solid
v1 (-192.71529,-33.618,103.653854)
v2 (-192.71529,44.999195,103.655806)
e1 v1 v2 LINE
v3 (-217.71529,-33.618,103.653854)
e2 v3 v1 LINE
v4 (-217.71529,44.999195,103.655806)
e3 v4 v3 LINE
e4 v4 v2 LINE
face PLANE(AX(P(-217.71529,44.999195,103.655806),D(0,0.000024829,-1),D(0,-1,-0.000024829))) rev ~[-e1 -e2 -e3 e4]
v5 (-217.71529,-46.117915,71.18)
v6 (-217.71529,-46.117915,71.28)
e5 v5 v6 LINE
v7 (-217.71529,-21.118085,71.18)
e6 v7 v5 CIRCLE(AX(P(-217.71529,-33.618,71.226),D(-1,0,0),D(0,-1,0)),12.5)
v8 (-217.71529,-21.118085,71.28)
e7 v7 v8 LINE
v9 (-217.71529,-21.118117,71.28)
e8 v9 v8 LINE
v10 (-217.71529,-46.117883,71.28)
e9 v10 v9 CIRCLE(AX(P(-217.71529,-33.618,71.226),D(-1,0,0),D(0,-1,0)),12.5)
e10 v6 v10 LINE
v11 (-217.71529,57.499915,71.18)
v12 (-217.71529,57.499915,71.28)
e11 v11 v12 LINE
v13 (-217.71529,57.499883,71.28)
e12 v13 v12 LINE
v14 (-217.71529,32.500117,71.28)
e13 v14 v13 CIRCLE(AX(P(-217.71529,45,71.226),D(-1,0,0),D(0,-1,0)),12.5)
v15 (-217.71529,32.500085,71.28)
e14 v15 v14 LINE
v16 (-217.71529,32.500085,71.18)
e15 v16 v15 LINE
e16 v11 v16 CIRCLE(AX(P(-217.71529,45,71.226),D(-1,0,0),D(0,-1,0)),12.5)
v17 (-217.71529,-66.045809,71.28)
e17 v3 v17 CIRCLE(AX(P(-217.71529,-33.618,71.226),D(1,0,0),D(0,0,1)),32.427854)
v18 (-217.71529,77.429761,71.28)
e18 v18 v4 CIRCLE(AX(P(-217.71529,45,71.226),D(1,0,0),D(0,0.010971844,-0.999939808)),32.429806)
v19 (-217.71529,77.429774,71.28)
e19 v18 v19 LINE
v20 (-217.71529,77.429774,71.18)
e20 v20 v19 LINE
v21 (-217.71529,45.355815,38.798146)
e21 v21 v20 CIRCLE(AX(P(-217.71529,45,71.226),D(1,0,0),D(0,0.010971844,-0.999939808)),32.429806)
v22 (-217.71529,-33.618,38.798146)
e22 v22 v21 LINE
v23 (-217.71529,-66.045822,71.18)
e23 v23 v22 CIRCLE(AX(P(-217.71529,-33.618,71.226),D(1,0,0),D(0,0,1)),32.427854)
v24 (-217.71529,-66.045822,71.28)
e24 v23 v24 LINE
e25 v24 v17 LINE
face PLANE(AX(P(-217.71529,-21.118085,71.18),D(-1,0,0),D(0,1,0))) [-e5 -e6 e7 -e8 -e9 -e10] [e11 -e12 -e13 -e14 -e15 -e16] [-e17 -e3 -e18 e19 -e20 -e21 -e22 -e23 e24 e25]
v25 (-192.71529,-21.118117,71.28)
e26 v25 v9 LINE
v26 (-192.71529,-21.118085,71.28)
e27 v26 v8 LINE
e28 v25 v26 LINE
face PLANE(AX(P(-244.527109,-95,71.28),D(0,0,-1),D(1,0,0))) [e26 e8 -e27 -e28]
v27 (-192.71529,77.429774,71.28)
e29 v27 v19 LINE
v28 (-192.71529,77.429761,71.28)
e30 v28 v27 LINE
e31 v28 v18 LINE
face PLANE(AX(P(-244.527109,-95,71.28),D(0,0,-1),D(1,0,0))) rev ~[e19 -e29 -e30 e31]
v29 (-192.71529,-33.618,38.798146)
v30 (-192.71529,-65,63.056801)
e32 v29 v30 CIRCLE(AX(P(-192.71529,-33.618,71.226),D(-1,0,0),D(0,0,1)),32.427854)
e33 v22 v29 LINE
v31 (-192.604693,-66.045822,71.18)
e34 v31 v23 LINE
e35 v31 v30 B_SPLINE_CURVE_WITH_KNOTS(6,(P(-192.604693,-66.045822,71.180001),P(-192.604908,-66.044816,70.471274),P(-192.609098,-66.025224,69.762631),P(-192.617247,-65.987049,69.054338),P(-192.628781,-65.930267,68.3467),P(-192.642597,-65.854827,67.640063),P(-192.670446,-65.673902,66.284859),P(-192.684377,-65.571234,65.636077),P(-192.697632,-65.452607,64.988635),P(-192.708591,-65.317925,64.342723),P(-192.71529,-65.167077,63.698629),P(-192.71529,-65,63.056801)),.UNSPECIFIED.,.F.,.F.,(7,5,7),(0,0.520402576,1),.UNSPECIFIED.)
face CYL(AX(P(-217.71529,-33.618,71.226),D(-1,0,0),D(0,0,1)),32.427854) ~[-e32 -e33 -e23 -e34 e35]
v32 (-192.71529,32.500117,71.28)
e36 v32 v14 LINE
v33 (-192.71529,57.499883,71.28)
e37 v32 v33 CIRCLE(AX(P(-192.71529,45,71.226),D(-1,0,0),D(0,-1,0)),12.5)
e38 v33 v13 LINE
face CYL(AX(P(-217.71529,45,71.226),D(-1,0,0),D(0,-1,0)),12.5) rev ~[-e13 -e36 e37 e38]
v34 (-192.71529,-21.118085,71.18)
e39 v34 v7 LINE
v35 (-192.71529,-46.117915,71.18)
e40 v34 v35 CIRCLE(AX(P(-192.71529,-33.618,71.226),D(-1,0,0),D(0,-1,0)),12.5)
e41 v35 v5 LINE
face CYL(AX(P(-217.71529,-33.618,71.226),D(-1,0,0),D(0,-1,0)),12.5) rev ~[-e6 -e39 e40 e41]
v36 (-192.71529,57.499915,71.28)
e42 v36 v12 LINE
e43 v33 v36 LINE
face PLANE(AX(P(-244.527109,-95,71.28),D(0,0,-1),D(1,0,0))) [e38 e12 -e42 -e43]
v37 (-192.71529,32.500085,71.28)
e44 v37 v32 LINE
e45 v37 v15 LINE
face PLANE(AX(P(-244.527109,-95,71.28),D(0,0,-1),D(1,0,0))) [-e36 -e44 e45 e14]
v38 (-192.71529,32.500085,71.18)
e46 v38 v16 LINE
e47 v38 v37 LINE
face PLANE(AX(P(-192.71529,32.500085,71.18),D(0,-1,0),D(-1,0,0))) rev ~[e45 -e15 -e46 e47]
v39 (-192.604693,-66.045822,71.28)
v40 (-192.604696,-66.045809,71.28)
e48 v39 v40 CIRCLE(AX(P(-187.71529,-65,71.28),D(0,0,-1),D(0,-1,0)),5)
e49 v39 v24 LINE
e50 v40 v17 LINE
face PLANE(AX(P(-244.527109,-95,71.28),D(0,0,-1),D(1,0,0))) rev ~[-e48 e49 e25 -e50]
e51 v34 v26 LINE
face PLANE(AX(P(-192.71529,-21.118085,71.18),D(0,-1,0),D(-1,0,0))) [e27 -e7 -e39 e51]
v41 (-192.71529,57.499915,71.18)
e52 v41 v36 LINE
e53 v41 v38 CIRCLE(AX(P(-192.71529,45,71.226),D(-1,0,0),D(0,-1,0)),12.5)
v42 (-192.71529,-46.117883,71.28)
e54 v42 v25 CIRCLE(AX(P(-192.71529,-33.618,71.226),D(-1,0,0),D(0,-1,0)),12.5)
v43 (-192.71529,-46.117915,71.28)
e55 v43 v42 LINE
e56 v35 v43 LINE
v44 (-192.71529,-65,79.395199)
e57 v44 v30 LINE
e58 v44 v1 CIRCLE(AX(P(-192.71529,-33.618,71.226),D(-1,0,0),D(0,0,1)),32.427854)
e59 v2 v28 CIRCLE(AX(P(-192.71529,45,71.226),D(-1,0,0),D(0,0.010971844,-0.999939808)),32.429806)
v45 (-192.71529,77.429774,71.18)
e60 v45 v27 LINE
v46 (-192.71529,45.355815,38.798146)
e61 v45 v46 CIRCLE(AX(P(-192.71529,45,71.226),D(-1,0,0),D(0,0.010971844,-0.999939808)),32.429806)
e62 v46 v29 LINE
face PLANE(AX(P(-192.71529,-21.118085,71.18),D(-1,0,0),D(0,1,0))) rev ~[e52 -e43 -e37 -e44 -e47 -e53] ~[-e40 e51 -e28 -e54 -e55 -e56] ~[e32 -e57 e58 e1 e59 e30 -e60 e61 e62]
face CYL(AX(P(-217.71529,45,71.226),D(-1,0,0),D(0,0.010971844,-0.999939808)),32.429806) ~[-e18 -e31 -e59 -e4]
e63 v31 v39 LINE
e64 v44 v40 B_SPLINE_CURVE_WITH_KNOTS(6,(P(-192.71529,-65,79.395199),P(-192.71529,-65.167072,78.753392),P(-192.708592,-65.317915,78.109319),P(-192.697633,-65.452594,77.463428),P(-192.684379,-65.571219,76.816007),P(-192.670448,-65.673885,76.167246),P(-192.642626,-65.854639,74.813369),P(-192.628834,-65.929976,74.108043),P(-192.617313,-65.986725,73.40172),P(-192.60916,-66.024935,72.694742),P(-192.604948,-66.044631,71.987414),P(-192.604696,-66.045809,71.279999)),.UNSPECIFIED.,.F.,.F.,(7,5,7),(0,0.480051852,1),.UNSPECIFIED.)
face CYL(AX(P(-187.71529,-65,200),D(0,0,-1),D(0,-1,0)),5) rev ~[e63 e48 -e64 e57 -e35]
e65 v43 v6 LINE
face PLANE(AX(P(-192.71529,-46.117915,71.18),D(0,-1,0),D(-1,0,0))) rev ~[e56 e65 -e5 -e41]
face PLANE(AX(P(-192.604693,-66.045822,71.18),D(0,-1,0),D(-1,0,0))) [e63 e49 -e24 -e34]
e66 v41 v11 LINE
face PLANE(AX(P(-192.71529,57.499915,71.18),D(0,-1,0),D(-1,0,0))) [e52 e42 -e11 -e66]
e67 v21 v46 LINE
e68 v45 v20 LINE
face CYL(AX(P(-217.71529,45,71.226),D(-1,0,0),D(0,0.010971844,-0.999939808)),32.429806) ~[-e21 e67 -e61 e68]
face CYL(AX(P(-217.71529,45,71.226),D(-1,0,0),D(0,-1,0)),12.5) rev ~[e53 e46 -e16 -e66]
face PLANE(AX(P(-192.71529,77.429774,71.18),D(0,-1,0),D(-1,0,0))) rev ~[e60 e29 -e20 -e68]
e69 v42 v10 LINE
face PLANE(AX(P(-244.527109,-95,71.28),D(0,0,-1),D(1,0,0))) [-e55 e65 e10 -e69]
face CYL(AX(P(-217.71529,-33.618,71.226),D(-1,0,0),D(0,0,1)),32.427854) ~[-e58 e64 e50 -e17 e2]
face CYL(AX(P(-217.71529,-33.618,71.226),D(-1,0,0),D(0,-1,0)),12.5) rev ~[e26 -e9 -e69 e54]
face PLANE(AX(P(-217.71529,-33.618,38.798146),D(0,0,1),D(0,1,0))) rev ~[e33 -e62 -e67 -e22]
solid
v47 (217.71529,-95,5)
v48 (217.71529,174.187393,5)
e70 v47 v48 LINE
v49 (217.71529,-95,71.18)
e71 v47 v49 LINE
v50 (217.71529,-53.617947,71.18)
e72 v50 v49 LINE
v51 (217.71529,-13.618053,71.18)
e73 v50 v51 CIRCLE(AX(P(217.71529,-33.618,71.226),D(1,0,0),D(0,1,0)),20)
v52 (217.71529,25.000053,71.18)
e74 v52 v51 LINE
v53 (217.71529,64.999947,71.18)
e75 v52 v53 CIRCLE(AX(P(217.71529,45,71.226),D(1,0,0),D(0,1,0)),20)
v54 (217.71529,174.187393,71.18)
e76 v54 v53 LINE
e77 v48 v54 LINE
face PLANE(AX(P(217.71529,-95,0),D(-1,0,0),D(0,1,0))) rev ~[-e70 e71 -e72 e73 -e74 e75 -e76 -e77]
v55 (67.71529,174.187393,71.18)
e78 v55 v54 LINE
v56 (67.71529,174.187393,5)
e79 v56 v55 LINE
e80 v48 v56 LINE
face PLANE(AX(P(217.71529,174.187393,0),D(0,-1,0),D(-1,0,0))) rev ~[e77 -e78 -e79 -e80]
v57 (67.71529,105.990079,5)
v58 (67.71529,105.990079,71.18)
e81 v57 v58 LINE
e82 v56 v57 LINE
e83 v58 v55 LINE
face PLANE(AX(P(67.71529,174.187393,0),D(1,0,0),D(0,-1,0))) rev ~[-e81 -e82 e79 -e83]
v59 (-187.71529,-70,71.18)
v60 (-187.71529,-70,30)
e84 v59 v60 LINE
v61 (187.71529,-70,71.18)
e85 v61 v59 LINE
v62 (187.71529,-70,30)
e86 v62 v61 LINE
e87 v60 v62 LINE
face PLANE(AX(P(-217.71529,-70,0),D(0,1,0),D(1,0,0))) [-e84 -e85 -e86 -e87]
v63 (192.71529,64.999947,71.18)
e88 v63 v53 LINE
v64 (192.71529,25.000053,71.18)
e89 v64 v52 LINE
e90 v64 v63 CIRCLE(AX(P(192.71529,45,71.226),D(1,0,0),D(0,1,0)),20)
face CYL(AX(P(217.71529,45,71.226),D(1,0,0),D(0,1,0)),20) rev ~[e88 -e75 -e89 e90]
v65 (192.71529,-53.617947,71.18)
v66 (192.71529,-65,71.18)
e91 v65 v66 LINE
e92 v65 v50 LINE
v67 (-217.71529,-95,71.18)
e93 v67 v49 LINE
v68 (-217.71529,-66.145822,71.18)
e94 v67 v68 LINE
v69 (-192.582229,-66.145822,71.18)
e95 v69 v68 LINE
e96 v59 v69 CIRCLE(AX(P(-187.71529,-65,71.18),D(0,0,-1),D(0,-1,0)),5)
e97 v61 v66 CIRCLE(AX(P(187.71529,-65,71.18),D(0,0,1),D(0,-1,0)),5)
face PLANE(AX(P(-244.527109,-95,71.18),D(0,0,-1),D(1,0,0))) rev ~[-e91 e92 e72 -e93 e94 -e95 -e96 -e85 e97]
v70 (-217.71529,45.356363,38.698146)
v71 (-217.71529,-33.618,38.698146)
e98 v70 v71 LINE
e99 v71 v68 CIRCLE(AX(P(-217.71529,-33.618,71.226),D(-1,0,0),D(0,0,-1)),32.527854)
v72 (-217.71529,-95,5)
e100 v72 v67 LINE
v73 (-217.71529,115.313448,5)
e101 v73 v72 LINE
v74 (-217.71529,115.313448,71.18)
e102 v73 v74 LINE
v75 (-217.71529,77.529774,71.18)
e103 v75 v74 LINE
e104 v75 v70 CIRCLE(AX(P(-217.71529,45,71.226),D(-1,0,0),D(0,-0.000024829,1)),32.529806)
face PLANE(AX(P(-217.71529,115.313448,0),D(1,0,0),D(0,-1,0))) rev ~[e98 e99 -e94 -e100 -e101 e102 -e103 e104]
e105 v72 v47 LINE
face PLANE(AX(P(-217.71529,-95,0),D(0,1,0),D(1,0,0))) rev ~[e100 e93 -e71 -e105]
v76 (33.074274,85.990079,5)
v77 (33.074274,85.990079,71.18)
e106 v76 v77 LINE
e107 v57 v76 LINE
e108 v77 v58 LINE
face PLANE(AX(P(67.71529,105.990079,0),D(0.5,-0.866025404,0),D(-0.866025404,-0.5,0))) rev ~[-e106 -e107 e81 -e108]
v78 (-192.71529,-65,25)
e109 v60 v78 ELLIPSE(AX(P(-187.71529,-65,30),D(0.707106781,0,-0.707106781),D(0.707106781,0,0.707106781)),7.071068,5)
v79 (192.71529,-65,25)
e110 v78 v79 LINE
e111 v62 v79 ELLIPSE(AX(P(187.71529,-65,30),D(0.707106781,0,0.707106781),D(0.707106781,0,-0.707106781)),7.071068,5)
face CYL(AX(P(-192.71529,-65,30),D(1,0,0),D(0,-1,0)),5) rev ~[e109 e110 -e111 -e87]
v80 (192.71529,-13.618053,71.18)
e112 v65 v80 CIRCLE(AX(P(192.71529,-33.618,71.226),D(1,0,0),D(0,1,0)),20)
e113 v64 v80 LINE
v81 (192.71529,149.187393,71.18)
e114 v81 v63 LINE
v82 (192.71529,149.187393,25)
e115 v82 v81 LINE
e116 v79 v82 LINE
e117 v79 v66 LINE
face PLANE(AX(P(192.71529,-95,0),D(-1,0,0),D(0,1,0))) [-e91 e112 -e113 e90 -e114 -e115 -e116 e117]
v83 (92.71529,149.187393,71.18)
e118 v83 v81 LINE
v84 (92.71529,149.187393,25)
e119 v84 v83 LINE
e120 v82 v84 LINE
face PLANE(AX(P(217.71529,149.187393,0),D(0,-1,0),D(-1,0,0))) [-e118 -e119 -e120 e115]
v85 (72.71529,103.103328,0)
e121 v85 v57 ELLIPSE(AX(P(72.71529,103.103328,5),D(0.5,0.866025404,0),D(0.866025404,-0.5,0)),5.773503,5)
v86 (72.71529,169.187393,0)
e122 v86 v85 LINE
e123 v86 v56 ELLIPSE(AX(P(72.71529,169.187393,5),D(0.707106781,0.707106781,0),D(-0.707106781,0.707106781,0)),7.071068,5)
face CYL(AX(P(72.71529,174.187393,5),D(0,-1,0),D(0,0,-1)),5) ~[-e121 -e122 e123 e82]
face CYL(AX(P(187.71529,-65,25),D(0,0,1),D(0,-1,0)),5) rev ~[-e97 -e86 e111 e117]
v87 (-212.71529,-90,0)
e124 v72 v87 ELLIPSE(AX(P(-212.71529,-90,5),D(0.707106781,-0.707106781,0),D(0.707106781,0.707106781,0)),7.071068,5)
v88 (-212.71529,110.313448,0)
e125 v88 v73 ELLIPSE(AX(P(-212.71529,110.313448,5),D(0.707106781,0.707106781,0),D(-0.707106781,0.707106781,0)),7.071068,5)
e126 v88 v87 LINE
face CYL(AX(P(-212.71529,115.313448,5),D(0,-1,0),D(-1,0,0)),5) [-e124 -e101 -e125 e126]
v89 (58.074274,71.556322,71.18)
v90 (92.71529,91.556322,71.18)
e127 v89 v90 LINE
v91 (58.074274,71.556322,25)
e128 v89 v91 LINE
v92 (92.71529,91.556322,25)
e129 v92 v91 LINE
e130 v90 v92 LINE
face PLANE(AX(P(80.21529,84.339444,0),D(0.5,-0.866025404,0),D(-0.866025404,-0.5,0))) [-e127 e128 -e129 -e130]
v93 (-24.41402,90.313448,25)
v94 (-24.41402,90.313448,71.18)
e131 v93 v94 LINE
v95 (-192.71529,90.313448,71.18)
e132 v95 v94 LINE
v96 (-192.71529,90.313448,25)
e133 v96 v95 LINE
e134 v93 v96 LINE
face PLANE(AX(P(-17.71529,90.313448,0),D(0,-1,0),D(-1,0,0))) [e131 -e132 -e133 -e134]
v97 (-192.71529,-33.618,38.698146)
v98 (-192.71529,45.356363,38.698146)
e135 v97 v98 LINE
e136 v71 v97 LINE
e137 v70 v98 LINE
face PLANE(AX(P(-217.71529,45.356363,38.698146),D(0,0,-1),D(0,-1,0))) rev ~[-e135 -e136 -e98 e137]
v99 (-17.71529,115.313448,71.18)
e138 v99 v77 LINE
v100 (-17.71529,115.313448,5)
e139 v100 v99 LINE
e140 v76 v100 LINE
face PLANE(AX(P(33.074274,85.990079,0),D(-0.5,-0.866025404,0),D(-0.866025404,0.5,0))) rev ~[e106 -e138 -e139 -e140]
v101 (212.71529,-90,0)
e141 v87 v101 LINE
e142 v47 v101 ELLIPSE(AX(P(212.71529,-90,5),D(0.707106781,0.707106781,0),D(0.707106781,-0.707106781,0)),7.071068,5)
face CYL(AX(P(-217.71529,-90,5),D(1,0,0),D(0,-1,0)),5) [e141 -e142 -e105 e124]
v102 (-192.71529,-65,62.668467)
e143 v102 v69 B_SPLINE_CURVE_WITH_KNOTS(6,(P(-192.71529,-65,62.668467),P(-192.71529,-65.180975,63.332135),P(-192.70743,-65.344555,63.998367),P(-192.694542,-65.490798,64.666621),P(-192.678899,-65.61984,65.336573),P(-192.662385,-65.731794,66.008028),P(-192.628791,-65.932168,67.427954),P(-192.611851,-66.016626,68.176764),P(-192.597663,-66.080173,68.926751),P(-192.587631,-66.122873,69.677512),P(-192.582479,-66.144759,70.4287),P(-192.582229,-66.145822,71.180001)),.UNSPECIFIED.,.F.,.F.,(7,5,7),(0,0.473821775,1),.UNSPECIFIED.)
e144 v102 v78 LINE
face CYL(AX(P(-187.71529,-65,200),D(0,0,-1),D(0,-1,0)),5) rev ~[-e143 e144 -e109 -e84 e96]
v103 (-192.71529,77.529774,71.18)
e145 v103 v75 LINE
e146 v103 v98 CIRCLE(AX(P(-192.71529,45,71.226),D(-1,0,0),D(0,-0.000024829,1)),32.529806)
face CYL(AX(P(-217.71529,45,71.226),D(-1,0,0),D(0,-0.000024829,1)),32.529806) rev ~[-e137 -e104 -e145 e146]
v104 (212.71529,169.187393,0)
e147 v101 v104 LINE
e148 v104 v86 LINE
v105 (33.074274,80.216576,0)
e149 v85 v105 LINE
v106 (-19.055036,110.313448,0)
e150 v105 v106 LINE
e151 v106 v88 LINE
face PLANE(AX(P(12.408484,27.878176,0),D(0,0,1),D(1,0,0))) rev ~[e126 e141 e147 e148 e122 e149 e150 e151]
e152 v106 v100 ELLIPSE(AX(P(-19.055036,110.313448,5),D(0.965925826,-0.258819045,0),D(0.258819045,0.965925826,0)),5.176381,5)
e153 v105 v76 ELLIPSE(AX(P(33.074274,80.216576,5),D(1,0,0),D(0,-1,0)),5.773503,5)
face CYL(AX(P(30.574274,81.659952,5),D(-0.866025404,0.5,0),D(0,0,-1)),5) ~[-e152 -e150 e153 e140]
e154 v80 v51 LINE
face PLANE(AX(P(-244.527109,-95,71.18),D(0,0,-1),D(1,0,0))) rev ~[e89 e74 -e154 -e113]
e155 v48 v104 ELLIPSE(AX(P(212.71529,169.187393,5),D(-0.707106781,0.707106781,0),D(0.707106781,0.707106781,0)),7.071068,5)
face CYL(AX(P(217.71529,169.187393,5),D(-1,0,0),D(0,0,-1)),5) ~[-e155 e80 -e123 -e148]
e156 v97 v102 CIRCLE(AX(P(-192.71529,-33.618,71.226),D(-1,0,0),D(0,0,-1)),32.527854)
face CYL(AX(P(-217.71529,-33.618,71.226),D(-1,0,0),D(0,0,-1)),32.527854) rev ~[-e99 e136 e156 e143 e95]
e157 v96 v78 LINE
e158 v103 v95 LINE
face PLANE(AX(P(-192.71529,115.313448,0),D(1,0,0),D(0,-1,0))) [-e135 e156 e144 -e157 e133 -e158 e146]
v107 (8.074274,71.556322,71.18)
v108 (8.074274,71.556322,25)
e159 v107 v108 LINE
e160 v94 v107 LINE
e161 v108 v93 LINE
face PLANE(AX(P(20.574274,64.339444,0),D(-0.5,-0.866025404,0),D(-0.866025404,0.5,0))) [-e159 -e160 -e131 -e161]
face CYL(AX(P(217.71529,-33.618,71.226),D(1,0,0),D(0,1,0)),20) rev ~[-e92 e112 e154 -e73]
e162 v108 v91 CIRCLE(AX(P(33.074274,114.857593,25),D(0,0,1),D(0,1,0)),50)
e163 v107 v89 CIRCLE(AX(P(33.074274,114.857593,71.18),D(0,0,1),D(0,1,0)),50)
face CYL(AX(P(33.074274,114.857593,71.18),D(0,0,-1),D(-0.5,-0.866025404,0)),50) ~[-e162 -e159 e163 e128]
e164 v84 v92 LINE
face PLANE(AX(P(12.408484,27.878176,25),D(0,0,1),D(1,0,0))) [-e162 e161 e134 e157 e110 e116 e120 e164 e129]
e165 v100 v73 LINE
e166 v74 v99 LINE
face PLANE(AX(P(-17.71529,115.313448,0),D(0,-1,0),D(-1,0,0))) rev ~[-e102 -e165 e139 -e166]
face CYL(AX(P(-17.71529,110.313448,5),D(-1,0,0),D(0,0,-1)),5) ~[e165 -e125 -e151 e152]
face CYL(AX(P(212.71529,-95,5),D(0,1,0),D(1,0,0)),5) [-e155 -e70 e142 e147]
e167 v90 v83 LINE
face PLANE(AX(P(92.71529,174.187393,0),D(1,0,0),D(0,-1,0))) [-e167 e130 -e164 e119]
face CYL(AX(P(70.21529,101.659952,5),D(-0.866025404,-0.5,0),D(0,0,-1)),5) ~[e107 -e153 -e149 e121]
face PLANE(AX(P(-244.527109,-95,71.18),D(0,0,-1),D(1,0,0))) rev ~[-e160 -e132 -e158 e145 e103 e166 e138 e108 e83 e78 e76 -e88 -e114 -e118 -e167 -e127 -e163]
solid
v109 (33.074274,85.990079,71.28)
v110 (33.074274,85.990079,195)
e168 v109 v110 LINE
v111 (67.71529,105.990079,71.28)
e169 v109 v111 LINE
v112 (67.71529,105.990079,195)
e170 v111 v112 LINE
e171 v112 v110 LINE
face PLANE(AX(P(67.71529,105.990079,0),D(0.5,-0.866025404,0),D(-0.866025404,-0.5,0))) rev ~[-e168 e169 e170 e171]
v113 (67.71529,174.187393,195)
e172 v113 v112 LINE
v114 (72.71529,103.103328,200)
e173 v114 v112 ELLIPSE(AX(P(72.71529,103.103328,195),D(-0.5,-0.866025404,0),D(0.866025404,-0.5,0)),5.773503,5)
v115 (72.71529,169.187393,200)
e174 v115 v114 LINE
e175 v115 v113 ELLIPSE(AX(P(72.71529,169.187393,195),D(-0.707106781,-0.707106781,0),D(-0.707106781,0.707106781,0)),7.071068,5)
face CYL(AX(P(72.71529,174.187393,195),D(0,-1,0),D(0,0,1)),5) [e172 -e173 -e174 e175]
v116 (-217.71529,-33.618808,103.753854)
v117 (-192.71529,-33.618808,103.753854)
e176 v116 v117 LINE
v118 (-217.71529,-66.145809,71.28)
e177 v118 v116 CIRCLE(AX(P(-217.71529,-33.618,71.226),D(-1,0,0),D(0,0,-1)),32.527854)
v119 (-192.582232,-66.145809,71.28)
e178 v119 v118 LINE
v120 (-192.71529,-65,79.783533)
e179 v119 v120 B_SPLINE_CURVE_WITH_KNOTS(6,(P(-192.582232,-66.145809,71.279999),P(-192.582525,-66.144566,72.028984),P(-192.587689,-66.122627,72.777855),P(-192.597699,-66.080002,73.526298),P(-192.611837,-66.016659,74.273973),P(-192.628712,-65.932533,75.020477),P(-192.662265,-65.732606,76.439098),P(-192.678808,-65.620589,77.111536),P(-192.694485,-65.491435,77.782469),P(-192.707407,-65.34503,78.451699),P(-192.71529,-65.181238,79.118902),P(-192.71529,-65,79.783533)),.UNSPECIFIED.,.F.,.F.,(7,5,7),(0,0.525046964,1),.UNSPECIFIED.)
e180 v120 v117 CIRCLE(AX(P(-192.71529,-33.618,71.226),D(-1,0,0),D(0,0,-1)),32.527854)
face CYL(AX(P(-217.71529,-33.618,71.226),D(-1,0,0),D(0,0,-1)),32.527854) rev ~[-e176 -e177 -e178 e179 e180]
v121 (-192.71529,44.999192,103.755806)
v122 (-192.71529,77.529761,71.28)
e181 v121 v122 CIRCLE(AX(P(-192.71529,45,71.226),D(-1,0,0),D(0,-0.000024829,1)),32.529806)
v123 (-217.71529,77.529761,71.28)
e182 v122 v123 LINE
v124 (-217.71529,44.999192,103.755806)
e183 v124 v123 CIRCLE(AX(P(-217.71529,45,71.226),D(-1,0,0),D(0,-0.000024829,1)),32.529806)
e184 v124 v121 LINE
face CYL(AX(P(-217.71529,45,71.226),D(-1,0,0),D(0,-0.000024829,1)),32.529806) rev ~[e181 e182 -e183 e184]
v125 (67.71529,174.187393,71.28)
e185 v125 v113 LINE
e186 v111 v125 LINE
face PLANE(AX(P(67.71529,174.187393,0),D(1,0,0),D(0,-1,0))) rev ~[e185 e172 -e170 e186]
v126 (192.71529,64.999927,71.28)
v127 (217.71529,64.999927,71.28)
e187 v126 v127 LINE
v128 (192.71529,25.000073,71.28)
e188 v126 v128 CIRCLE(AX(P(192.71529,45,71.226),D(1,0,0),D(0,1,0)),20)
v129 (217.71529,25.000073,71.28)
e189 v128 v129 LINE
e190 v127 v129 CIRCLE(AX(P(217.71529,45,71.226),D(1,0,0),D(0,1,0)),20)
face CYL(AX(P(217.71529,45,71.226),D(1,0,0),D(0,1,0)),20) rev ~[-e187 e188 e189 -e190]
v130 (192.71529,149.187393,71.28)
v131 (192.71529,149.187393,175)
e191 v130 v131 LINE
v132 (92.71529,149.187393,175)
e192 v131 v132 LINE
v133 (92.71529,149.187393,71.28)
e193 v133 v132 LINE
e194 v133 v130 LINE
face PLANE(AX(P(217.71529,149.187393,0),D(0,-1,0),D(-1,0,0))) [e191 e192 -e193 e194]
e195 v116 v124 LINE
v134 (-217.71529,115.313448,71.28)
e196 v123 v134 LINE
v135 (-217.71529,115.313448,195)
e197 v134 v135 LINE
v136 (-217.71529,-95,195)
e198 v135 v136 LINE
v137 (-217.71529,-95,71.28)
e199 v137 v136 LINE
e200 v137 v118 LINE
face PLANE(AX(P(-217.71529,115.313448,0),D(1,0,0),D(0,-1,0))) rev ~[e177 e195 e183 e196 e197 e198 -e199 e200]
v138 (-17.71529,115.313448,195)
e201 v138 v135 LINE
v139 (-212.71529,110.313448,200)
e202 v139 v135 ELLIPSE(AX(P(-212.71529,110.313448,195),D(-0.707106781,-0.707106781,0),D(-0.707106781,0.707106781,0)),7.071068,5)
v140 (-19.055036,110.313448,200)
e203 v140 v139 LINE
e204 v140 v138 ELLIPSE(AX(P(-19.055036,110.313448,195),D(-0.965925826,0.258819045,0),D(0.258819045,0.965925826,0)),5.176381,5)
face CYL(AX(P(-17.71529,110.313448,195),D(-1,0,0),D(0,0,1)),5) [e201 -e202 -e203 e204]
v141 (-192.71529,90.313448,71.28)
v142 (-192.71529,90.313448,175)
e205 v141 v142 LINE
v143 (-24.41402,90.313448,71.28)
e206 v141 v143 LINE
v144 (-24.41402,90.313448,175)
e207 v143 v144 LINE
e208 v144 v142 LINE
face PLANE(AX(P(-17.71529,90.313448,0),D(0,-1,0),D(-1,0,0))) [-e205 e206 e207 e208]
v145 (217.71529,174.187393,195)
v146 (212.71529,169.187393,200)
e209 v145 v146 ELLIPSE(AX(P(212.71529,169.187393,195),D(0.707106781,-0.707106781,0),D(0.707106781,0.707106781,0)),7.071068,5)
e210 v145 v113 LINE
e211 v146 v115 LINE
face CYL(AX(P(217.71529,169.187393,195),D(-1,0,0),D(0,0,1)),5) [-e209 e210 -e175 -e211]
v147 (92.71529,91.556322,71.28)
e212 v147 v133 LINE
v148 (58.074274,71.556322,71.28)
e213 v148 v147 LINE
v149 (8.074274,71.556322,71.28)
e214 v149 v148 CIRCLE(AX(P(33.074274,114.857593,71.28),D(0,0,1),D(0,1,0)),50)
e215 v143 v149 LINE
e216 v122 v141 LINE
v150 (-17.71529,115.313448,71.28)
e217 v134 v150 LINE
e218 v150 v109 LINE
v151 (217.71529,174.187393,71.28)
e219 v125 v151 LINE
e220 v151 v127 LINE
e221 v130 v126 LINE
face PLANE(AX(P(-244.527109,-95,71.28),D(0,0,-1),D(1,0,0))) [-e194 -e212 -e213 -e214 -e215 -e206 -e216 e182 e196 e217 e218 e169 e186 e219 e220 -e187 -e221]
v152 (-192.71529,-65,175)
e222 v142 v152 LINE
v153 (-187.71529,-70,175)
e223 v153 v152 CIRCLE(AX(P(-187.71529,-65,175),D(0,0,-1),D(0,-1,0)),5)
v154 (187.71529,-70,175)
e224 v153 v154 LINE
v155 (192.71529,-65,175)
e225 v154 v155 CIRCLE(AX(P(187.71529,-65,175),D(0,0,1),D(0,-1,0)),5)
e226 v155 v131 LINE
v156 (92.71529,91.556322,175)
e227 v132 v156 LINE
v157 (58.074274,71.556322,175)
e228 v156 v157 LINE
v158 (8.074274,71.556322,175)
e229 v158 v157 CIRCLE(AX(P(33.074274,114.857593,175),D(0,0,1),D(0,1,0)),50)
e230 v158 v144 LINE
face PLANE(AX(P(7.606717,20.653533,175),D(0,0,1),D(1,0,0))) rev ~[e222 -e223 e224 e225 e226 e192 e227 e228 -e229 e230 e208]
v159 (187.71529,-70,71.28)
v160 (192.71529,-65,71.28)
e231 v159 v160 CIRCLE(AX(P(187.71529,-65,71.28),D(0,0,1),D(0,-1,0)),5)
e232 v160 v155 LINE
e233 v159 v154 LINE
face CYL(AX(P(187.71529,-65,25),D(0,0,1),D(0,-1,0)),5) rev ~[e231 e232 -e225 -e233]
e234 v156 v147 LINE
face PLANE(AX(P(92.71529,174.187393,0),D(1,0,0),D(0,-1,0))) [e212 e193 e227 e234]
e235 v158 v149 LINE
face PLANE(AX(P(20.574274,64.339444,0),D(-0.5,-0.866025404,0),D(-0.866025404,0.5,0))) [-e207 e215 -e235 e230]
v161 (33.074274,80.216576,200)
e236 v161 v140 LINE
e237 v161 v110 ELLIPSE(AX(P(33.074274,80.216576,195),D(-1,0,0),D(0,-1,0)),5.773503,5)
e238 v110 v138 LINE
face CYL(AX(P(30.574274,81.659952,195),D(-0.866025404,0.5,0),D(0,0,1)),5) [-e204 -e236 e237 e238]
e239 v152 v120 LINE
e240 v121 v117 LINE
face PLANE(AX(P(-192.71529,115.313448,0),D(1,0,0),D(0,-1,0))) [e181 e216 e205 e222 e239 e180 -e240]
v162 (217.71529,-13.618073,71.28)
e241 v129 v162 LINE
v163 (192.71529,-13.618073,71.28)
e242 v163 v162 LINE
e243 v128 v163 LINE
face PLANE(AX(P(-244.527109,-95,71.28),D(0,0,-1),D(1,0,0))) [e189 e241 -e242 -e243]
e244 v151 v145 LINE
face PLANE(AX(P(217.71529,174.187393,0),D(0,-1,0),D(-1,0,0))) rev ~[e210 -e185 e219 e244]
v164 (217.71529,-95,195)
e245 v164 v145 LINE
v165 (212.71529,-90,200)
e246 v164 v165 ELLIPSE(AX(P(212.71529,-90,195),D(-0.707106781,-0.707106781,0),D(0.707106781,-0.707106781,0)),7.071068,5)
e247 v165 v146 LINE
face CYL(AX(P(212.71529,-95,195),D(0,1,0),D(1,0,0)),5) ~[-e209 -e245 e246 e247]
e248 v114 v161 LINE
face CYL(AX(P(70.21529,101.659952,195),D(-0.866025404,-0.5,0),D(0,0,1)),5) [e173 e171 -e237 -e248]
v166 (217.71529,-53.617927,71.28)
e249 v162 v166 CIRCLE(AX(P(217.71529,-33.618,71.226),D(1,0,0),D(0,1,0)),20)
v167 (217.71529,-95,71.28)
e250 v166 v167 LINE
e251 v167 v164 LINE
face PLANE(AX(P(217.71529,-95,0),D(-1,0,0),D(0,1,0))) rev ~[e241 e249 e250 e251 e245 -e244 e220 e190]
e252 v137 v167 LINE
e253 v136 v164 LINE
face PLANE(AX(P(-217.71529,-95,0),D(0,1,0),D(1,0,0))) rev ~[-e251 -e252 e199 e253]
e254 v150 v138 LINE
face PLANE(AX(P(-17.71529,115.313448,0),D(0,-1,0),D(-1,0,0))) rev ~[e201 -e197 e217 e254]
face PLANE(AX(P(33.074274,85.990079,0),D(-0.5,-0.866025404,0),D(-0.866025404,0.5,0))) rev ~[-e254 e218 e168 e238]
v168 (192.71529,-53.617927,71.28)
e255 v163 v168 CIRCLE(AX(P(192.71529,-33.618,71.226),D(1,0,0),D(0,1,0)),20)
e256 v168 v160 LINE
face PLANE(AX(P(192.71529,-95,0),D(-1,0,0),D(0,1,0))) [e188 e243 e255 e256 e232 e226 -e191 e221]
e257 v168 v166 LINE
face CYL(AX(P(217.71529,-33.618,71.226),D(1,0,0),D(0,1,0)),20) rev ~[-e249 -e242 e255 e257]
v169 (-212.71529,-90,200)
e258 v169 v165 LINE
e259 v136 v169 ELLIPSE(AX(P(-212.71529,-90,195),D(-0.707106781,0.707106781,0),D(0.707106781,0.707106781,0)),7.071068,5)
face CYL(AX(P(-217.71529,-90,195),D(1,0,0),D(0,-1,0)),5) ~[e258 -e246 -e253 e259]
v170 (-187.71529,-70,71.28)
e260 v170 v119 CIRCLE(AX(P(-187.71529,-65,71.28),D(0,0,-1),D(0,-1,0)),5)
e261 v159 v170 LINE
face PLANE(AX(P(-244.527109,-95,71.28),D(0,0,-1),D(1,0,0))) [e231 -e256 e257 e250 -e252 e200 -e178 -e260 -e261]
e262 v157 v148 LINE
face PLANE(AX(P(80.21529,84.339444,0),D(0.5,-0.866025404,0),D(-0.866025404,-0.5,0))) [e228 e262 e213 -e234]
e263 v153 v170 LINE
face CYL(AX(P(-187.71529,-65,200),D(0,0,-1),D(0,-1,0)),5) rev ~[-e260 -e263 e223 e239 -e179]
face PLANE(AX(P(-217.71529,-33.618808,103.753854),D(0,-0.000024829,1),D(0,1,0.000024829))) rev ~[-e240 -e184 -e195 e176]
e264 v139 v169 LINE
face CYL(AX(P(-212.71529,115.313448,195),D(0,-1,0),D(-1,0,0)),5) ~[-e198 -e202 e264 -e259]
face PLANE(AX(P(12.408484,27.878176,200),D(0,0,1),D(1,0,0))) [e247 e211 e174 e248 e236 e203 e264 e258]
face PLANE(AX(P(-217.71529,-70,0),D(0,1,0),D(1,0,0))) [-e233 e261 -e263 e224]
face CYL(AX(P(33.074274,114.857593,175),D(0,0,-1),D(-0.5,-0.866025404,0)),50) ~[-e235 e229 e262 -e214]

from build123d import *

# Parameters (mm, degrees)
F1_DEPTH  = 200
F2_T      = -25
F3_R      = 20
F4_DEPTH  = 25
F5_R      = 5
F6_R      = 12.5
F7_DEPTH  = 25
F8_W      = 515.9801917831
F8_H      = 0.1
F9_DEPTH  = 500
F11_DEPTH = 25
F12_R     = 50
F14_DEPTH = 30
F15_DEPTH = 0.1


with BuildPart() as f1:
    # F0 (on Top) → F1 (new body)
    with BuildSketch(Plane.XY):
        Polygon((-217.7152904997, -95), (217.7152904997, -95), (217.7152904997, 95), (217.7152904997, 174.1873925667), (67.7152904997, 174.1873925667), (67.7152904997, 105.9900790749), (33.0742743483, 85.9900790749), (-17.7152904997, 115.3134480119), (-217.7152904997, 115.3134480119), (-217.7152904997, 95), align=None)
    extrude(amount=F1_DEPTH)

    # F2
    f2_openings = [f1.faces().sort_by_distance(p)[0] for p in [
        (12.289401, 20.806229, 200),
    ]]
    offset(amount=F2_T, openings=f2_openings, kind=Kind.INTERSECTION)

    # F3 (on face) → F4 (cut)
    with BuildSketch(Plane.YZ.offset(217.7152904997)):
        with Locations((45, 71.226)):
            Circle(F3_R)
        with Locations((-33.618, 71.226)):
            Circle(F3_R)
    extrude(amount=-F4_DEPTH, mode=Mode.SUBTRACT)

    # F5
    f5_edges = [f1.edges().sort_by_distance(p)[0] for p in [
        (0, -70, 25),
        (0, -95, 200),
        (217.71529, 39.593696, 200),
        (142.71529, 174.187393, 200),
        (67.71529, 140.088736, 200),
        (50.394782, 95.990079, 200),
        (7.679492, 100.651764, 200),
        (-117.71529, 115.313448, 200),
        (-217.71529, 10.156724, 200),
        (0, -95, 0),
        (217.71529, 39.593696, 0),
        (142.71529, 174.187393, 0),
        (67.71529, 140.088736, 0),
        (50.394782, 95.990079, 0),
        (7.679492, 100.651764, 0),
        (-117.71529, 115.313448, 0),
        (-217.71529, 10.156724, 0),
        (-192.71529, -70, 112.5),
        (192.71529, -70, 112.5),
    ]]
    fillet(f5_edges, radius=F5_R)

    # F6 (on face) → F7 (cut)
    with BuildSketch(Plane(origin=(-217.7152904997, 0, 0), x_dir=(0, -1, 0), z_dir=(-1, 0, 0))):
        with Locations((-45, 71.226)):
            Circle(F6_R)
        with Locations((33.618, 71.226)):
            Circle(F6_R)
    extrude(amount=-F7_DEPTH, mode=Mode.SUBTRACT)

    # F8 (on face) → F9 (cut)
    with BuildSketch(Plane.XZ.offset(95)):
        with Locations((13.46298667, 71.23)):
            Rectangle(F8_W, F8_H)
    extrude(amount=-F9_DEPTH, mode=Mode.SUBTRACT)

    # F10 (on face) → F11 (join)
    with BuildSketch(Plane.XY.offset(200)):
        Polygon((-197.7152904997, 95.3134480119), (-212.7152904997, -90), (197.7152904997, -75), (197.7152904997, 154.1873925667), (87.7152904997, 154.1873925667), (87.7152904997, 94.4430736911), (33.0742743483, 62.8960683073), (-23.0742743483, 95.3134480119), align=None)
    extrude(amount=-F11_DEPTH)

    # F12
    f12_edges = [f1.edges().sort_by_distance(p)[0] for p in [
        (33.074274, 57.122566, 48.09),
        (33.074274, 57.122566, 123.14),
    ]]
    fillet(f12_edges, radius=F12_R)

    # F13 (on face) → F14 (cut)
    with BuildSketch(Plane(origin=(-217.7152904997, 0, 0), x_dir=(0, -1, 0), z_dir=(-1, 0, 0))):
        with BuildLine():
            Line((33.6188076483, 103.7538542444), (-44.9991923032, 103.7558062851))
            ThreePointArc((-44.9991923032, 103.7558062851), (-77.5293160692, 71.4045879899), (-45.3563629488, 38.6981457356))
            Line((-45.3563629488, 38.6981457356), (33.618, 38.6981457356))
            ThreePointArc((33.618, 38.6981457356), (66.1458542619, 71.2255961758), (33.6188076483, 103.7538542544))
        make_face()
        with BuildLine():
            ThreePointArc((-45.3558147624, 38.7981457356), (-77.4293160726, 71.4043126593), (-44.9991947862, 103.6558062851))
            Line((-44.9991947862, 103.6558062851), (33.618, 103.6538542644))
            ThreePointArc((33.618, 103.6538542644), (66.0458542644, 71.226), (33.618, 38.7981457356))
            Line((33.618, 38.7981457356), (-45.3558147624, 38.7981457356))
        make_face(mode=Mode.SUBTRACT)
    extrude(amount=-F14_DEPTH, mode=Mode.SUBTRACT)

    # F15 (add): faces of the model
    f15_faces = [f1.faces().sort_by_distance(p)[0] for p in [
        (-205.2152904997, 5.691, 71.18),
        (-205.2152904997, 67.4648445152, 71.18),
        (-205.2143249793, -56.0826160003, 71.18),
    ]]
    extrude(f15_faces, amount=F15_DEPTH)


solid = f1.part
